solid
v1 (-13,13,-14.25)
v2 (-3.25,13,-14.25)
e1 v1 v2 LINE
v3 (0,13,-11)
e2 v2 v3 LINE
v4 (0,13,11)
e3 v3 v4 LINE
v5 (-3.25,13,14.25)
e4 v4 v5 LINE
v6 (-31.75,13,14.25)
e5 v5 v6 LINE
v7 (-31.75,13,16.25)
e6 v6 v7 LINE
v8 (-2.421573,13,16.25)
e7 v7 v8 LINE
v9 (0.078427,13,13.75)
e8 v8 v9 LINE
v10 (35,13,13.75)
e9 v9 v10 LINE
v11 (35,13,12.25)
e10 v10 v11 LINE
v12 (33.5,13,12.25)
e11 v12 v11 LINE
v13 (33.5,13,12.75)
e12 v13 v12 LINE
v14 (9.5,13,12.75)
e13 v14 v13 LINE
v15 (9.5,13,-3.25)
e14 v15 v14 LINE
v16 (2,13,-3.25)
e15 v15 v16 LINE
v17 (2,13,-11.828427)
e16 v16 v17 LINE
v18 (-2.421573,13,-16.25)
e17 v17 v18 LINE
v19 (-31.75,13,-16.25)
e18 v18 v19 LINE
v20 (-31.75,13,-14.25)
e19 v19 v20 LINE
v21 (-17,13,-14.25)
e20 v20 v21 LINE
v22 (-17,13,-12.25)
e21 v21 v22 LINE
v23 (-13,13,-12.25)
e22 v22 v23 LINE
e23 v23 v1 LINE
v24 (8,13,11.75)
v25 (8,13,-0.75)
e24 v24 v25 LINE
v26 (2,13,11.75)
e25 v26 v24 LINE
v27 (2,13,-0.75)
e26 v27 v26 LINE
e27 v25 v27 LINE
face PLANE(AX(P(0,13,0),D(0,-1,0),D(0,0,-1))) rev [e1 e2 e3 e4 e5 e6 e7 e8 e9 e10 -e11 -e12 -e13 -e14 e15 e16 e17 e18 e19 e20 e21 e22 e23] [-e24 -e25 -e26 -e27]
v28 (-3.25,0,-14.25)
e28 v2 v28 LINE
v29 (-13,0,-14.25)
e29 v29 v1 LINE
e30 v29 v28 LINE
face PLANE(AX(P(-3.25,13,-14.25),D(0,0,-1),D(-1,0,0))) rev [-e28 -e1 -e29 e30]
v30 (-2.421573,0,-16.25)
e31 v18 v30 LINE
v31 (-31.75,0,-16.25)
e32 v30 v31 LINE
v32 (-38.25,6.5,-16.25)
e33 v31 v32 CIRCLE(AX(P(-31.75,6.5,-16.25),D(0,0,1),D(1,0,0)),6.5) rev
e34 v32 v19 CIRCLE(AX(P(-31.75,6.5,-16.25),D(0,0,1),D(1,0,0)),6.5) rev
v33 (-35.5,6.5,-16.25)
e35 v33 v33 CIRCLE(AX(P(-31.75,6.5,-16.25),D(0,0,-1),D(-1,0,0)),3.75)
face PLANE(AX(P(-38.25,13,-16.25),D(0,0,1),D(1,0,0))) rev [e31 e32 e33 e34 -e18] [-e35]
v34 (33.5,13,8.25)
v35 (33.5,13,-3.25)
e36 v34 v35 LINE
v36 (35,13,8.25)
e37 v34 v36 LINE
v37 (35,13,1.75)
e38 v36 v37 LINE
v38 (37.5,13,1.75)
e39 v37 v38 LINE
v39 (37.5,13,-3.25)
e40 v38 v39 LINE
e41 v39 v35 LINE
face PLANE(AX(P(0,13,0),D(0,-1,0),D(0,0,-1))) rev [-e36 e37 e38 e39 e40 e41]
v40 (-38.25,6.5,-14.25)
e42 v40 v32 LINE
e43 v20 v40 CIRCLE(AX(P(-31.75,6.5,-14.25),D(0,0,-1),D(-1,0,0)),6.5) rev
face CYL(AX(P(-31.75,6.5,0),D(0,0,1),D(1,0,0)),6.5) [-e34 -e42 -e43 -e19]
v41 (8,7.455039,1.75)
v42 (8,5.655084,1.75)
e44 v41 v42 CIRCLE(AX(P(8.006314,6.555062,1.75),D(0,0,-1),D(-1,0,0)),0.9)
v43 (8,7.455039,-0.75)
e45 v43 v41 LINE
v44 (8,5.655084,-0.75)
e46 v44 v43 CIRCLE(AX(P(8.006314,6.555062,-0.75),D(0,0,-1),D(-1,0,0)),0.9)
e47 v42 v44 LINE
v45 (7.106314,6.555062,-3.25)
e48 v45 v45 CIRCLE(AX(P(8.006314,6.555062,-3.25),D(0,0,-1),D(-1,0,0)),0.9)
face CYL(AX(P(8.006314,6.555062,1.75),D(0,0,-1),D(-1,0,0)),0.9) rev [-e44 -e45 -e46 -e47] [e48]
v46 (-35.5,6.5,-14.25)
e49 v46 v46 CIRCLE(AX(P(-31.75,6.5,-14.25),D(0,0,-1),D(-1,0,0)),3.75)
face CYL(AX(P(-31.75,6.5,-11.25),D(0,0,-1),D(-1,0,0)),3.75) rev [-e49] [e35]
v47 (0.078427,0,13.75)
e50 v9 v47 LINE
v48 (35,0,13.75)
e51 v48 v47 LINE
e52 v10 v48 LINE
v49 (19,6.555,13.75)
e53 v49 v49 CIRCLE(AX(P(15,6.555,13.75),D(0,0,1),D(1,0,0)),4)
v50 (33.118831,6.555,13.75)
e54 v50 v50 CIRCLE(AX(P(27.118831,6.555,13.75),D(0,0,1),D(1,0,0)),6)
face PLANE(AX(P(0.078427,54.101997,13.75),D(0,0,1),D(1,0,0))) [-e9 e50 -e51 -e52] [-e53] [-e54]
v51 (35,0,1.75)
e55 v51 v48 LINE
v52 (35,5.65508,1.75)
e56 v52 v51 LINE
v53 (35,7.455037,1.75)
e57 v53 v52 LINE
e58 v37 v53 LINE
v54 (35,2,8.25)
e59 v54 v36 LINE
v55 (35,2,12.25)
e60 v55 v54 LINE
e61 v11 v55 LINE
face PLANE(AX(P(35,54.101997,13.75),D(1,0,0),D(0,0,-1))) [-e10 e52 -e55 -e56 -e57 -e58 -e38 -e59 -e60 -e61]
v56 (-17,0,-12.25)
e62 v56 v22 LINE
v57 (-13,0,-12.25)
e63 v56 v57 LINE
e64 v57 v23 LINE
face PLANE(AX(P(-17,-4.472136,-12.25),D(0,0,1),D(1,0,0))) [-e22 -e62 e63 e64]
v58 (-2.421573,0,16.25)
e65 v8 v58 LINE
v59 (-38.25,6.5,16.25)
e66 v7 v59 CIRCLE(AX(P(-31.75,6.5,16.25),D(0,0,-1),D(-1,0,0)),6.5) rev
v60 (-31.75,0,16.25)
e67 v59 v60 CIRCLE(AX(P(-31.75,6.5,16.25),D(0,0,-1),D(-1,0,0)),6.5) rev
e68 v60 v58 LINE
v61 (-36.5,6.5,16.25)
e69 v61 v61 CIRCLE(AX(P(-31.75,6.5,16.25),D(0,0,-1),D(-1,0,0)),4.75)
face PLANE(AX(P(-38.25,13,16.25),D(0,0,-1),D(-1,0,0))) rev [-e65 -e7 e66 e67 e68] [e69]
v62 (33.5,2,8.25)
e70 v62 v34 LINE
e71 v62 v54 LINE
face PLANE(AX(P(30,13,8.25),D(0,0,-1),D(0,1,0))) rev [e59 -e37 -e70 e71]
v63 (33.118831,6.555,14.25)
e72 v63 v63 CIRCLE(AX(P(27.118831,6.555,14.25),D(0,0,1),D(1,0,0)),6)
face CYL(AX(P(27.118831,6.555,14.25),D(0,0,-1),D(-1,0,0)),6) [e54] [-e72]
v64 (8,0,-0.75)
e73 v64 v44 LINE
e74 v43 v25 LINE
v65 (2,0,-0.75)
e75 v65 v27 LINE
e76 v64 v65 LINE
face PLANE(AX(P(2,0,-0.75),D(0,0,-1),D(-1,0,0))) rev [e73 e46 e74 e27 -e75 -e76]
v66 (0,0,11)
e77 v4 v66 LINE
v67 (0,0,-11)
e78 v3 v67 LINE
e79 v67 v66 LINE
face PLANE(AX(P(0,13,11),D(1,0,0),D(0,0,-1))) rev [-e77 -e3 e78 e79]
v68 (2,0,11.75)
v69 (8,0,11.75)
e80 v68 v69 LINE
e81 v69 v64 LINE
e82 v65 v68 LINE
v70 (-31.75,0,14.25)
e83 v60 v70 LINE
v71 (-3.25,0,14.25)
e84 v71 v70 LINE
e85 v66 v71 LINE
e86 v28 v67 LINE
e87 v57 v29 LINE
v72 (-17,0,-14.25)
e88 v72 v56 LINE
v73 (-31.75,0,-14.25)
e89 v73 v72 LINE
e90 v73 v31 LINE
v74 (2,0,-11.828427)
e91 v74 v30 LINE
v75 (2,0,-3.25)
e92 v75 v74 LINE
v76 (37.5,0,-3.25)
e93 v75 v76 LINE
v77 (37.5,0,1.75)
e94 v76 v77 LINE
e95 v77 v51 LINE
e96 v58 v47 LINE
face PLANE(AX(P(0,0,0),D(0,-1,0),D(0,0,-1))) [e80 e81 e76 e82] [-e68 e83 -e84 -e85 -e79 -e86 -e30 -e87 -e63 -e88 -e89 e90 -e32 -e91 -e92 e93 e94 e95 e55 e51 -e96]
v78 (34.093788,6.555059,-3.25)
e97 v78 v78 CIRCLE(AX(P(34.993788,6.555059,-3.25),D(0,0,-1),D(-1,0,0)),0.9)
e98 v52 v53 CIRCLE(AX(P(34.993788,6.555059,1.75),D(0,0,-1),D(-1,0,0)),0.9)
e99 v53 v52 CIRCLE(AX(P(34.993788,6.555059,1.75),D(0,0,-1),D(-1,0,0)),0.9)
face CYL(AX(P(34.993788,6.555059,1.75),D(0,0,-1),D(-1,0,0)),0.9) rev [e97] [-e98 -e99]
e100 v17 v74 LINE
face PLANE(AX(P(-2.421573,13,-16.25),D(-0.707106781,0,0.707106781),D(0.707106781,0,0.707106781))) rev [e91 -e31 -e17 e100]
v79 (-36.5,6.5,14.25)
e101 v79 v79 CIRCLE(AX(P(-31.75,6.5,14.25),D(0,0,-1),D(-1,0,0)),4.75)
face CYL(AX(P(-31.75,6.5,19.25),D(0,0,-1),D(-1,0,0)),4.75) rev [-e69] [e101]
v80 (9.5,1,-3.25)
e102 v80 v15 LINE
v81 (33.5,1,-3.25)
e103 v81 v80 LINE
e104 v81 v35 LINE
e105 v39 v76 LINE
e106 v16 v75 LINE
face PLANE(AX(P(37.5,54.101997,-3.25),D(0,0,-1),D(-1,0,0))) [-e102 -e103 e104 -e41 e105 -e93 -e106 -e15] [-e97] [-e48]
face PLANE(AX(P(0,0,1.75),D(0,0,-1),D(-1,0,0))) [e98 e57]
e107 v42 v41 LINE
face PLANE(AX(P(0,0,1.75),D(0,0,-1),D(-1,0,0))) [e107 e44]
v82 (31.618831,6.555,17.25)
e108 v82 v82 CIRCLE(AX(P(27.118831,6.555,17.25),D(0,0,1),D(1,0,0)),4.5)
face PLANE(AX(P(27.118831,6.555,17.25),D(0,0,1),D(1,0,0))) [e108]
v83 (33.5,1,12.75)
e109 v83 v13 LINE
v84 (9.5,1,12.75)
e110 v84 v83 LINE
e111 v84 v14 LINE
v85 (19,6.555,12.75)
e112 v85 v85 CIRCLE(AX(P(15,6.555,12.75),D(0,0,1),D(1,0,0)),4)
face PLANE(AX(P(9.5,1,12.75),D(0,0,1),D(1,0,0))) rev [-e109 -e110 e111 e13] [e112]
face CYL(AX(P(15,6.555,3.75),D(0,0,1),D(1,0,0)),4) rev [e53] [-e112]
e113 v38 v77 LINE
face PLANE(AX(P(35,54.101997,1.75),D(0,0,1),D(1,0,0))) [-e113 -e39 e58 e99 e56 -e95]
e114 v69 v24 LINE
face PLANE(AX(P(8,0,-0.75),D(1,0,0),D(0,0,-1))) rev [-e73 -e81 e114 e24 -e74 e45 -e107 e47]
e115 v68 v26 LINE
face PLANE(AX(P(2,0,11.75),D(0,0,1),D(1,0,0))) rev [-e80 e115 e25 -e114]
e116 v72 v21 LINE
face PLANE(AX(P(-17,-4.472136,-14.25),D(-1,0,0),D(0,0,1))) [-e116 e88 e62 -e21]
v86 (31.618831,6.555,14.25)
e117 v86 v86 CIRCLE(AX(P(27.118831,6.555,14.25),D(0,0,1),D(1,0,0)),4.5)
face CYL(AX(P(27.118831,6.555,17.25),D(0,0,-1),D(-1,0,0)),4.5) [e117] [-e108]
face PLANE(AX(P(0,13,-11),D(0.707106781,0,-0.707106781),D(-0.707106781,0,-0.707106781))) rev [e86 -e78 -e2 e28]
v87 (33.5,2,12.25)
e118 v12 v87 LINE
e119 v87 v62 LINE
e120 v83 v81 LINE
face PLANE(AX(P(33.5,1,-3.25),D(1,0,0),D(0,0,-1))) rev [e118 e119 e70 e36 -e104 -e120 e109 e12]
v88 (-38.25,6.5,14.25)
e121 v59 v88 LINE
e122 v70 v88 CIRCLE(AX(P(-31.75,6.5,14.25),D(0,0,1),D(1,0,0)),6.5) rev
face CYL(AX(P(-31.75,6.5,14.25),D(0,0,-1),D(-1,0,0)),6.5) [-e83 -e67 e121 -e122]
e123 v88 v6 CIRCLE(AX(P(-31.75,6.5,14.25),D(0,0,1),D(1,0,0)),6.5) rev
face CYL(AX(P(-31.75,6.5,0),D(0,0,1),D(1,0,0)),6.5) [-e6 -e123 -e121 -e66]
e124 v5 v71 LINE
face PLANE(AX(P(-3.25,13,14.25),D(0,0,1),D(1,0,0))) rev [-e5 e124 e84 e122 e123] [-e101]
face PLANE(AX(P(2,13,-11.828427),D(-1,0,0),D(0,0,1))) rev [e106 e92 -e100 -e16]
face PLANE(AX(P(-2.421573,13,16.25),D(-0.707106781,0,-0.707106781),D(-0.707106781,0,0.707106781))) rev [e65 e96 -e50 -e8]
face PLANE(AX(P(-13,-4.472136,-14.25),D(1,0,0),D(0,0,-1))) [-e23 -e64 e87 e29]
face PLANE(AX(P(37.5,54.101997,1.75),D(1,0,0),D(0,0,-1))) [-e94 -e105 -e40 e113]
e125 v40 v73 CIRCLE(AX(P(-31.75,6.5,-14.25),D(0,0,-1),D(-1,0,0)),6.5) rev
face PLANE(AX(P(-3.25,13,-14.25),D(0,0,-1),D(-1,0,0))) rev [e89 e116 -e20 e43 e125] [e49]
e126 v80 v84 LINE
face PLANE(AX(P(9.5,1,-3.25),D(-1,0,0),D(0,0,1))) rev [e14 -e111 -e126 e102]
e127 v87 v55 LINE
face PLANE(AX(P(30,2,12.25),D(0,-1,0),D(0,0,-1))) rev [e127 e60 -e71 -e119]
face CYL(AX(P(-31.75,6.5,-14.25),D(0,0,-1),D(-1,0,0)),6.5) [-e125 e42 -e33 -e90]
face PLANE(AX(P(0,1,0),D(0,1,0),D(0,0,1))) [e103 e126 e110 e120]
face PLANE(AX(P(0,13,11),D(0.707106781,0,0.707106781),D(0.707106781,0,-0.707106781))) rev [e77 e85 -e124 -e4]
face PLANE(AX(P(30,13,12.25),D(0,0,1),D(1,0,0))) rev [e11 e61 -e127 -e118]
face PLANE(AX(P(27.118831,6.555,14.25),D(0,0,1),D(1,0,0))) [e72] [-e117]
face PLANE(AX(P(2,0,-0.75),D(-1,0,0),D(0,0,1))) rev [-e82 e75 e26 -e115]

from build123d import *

# Parameters (mm, degrees)
P_IDAT_VYSUNUT_M1_DEPTH  = 13
P_IDAT_VYSUNUT_M2_DEPTH  = 13
SKICA3_W                 = 6
SKICA3_H                 = 12.5
ODEBRAT_VYSUNUT_M1_DEPTH = 44.544517451
SKICA4_W                 = 24
SKICA4_H                 = 16
ODEBRAT_VYSUNUT_M2_DEPTH = 12
SKICA5_R                 = 0.9
ODEBRAT_VYSUNUT_M3_DEPTH = 5
ZAOBLIT1_R               = 6.5
SKICA6_R                 = 3.75
ODEBRAT_VYSUNUT_M4_DEPTH = 5
SKICA7_R                 = 4.75
ODEBRAT_VYSUNUT_M5_DEPTH = 5
SKICA8_W                 = 4
SKICA8_H                 = 11
ODEBRAT_VYSUNUT_M6_DEPTH = 5
SKICA9_R                 = 4
ODEBRAT_VYSUNUT_M7_DEPTH = 10
SKICA10_R                = 6
P_IDAT_VYSUNUT_M3_DEPTH  = 0.5
SKICA11_R                = 4.5
P_IDAT_VYSUNUT_M4_DEPTH  = 3
SKICA12_W                = 4
SKICA12_H                = 2
P_IDAT_VYSUNUT_M5_DEPTH  = 13


with BuildPart() as part:
    # Skica1 → Přidat vysunutím1 (new body)
    with BuildSketch(Plane(origin=(0, 0, 0), x_dir=(1, 0, 0), z_dir=(0, 1, 0))):
        Polygon((0, -11), (0, 11), (-3.25, 14.25), (-38.25, 14.25), (-38.25, 16.25), (-2.421572875, 16.25), (2, 11.828427125), (2, -11.828427125), (-2.421572875, -16.25), (-38.25, -16.25), (-38.25, -14.25), (-3.25, -14.25), align=None)
    extrude(amount=P_IDAT_VYSUNUT_M1_DEPTH)

    # Skica2 → Přidat vysunutím2 (add)
    with BuildSketch(Plane.XZ):
        Polygon((0.078427125, 13.75), (35, 13.75), (35, 1.75), (37.5, 1.75), (37.5, -3.25), (2, -3.25), (2, 11.828427125), align=None)
    extrude(amount=-P_IDAT_VYSUNUT_M2_DEPTH)

    # Skica3 → Odebrat vysunutím1 (cut, through all)
    with BuildSketch(Plane(origin=(0, 13, 0), x_dir=(1, 0, 0), z_dir=(0, 1, 0))):
        with Locations((5, -5.5)):
            Rectangle(SKICA3_W, SKICA3_H)
    extrude(amount=-ODEBRAT_VYSUNUT_M1_DEPTH, mode=Mode.SUBTRACT)

    # Skica4 → Odebrat vysunutím2 (cut)
    with BuildSketch(Plane(origin=(0, 13, 0), x_dir=(1, 0, 0), z_dir=(0, 1, 0))):
        with Locations((21.5, -4.75)):
            Rectangle(SKICA4_W, SKICA4_H)
    extrude(amount=-ODEBRAT_VYSUNUT_M2_DEPTH, mode=Mode.SUBTRACT)

    # Skica5 → Odebrat vysunutím3 (cut)
    with BuildSketch(Plane(origin=(0, 0, -3.25), x_dir=(-1, 0, 0), z_dir=(0, 0, -1))):
        with Locations((-34.993787626, 6.555058734)):
            Circle(SKICA5_R)
        with Locations((-8.006314188, 6.5550616)):
            Circle(SKICA5_R)
    extrude(amount=-ODEBRAT_VYSUNUT_M3_DEPTH, mode=Mode.SUBTRACT)

    # Zaoblit1
    zaoblit1_edges = [part.edges().sort_by_distance(p)[0] for p in [
        (-38.25, 0, -15.25),
        (-38.25, 0, 15.25),
        (-38.25, 13, 15.25),
        (-38.25, 13, -15.25),
    ]]
    fillet(zaoblit1_edges, radius=ZAOBLIT1_R - 0.0001)  # a hair under: the kernel refuses the full size

    # Skica6 → Odebrat vysunutím4 (cut)
    with BuildSketch(Plane(origin=(0, 0, -16.25), x_dir=(-1, 0, 0), z_dir=(0, 0, -1))):
        with Locations((31.75, 6.5)):
            Circle(SKICA6_R)
    extrude(amount=-ODEBRAT_VYSUNUT_M4_DEPTH, mode=Mode.SUBTRACT)

    # Skica7 → Odebrat vysunutím5 (cut)
    with BuildSketch(Plane(origin=(0, 0, 14.25), x_dir=(-1, 0, 0), z_dir=(0, 0, -1))):
        with Locations((31.75, 6.5)):
            Circle(SKICA7_R)
    extrude(amount=-ODEBRAT_VYSUNUT_M5_DEPTH, mode=Mode.SUBTRACT)

    # Skica8 → Odebrat vysunutím6 (cut)
    with BuildSketch(Plane(origin=(35, 0, 0), x_dir=(0, 0, -1), z_dir=(1, 0, 0))):
        with Locations((-10.25, 7.5)):
            Rectangle(SKICA8_W, SKICA8_H)
    extrude(amount=-ODEBRAT_VYSUNUT_M6_DEPTH, mode=Mode.SUBTRACT)

    # Skica9 → Odebrat vysunutím7 (cut)
    with BuildSketch(Plane.XY.offset(13.75)):
        with Locations((15, 6.554999832)):
            Circle(SKICA9_R)
    extrude(amount=-ODEBRAT_VYSUNUT_M7_DEPTH, mode=Mode.SUBTRACT)

    # Skica10 → Přidat vysunutím3 (add)
    with BuildSketch(Plane.XY.offset(13.75)):
        with Locations((27.118831388, 6.554999832)):
            Circle(SKICA10_R)
    extrude(amount=P_IDAT_VYSUNUT_M3_DEPTH)

    # Skica11 → Přidat vysunutím4 (add)
    with BuildSketch(Plane.XY.offset(14.25)):
        with Locations((27.118831388, 6.554999832)):
            Circle(SKICA11_R)
    extrude(amount=P_IDAT_VYSUNUT_M4_DEPTH)

    # Skica12 → Přidat vysunutím5 (add)
    with BuildSketch(Plane(origin=(0, 13, 0), x_dir=(1, 0, 0), z_dir=(0, 1, 0))):
        with Locations((-15, 13.25)):
            Rectangle(SKICA12_W, SKICA12_H)
    extrude(amount=-P_IDAT_VYSUNUT_M5_DEPTH)


solid = part.part
